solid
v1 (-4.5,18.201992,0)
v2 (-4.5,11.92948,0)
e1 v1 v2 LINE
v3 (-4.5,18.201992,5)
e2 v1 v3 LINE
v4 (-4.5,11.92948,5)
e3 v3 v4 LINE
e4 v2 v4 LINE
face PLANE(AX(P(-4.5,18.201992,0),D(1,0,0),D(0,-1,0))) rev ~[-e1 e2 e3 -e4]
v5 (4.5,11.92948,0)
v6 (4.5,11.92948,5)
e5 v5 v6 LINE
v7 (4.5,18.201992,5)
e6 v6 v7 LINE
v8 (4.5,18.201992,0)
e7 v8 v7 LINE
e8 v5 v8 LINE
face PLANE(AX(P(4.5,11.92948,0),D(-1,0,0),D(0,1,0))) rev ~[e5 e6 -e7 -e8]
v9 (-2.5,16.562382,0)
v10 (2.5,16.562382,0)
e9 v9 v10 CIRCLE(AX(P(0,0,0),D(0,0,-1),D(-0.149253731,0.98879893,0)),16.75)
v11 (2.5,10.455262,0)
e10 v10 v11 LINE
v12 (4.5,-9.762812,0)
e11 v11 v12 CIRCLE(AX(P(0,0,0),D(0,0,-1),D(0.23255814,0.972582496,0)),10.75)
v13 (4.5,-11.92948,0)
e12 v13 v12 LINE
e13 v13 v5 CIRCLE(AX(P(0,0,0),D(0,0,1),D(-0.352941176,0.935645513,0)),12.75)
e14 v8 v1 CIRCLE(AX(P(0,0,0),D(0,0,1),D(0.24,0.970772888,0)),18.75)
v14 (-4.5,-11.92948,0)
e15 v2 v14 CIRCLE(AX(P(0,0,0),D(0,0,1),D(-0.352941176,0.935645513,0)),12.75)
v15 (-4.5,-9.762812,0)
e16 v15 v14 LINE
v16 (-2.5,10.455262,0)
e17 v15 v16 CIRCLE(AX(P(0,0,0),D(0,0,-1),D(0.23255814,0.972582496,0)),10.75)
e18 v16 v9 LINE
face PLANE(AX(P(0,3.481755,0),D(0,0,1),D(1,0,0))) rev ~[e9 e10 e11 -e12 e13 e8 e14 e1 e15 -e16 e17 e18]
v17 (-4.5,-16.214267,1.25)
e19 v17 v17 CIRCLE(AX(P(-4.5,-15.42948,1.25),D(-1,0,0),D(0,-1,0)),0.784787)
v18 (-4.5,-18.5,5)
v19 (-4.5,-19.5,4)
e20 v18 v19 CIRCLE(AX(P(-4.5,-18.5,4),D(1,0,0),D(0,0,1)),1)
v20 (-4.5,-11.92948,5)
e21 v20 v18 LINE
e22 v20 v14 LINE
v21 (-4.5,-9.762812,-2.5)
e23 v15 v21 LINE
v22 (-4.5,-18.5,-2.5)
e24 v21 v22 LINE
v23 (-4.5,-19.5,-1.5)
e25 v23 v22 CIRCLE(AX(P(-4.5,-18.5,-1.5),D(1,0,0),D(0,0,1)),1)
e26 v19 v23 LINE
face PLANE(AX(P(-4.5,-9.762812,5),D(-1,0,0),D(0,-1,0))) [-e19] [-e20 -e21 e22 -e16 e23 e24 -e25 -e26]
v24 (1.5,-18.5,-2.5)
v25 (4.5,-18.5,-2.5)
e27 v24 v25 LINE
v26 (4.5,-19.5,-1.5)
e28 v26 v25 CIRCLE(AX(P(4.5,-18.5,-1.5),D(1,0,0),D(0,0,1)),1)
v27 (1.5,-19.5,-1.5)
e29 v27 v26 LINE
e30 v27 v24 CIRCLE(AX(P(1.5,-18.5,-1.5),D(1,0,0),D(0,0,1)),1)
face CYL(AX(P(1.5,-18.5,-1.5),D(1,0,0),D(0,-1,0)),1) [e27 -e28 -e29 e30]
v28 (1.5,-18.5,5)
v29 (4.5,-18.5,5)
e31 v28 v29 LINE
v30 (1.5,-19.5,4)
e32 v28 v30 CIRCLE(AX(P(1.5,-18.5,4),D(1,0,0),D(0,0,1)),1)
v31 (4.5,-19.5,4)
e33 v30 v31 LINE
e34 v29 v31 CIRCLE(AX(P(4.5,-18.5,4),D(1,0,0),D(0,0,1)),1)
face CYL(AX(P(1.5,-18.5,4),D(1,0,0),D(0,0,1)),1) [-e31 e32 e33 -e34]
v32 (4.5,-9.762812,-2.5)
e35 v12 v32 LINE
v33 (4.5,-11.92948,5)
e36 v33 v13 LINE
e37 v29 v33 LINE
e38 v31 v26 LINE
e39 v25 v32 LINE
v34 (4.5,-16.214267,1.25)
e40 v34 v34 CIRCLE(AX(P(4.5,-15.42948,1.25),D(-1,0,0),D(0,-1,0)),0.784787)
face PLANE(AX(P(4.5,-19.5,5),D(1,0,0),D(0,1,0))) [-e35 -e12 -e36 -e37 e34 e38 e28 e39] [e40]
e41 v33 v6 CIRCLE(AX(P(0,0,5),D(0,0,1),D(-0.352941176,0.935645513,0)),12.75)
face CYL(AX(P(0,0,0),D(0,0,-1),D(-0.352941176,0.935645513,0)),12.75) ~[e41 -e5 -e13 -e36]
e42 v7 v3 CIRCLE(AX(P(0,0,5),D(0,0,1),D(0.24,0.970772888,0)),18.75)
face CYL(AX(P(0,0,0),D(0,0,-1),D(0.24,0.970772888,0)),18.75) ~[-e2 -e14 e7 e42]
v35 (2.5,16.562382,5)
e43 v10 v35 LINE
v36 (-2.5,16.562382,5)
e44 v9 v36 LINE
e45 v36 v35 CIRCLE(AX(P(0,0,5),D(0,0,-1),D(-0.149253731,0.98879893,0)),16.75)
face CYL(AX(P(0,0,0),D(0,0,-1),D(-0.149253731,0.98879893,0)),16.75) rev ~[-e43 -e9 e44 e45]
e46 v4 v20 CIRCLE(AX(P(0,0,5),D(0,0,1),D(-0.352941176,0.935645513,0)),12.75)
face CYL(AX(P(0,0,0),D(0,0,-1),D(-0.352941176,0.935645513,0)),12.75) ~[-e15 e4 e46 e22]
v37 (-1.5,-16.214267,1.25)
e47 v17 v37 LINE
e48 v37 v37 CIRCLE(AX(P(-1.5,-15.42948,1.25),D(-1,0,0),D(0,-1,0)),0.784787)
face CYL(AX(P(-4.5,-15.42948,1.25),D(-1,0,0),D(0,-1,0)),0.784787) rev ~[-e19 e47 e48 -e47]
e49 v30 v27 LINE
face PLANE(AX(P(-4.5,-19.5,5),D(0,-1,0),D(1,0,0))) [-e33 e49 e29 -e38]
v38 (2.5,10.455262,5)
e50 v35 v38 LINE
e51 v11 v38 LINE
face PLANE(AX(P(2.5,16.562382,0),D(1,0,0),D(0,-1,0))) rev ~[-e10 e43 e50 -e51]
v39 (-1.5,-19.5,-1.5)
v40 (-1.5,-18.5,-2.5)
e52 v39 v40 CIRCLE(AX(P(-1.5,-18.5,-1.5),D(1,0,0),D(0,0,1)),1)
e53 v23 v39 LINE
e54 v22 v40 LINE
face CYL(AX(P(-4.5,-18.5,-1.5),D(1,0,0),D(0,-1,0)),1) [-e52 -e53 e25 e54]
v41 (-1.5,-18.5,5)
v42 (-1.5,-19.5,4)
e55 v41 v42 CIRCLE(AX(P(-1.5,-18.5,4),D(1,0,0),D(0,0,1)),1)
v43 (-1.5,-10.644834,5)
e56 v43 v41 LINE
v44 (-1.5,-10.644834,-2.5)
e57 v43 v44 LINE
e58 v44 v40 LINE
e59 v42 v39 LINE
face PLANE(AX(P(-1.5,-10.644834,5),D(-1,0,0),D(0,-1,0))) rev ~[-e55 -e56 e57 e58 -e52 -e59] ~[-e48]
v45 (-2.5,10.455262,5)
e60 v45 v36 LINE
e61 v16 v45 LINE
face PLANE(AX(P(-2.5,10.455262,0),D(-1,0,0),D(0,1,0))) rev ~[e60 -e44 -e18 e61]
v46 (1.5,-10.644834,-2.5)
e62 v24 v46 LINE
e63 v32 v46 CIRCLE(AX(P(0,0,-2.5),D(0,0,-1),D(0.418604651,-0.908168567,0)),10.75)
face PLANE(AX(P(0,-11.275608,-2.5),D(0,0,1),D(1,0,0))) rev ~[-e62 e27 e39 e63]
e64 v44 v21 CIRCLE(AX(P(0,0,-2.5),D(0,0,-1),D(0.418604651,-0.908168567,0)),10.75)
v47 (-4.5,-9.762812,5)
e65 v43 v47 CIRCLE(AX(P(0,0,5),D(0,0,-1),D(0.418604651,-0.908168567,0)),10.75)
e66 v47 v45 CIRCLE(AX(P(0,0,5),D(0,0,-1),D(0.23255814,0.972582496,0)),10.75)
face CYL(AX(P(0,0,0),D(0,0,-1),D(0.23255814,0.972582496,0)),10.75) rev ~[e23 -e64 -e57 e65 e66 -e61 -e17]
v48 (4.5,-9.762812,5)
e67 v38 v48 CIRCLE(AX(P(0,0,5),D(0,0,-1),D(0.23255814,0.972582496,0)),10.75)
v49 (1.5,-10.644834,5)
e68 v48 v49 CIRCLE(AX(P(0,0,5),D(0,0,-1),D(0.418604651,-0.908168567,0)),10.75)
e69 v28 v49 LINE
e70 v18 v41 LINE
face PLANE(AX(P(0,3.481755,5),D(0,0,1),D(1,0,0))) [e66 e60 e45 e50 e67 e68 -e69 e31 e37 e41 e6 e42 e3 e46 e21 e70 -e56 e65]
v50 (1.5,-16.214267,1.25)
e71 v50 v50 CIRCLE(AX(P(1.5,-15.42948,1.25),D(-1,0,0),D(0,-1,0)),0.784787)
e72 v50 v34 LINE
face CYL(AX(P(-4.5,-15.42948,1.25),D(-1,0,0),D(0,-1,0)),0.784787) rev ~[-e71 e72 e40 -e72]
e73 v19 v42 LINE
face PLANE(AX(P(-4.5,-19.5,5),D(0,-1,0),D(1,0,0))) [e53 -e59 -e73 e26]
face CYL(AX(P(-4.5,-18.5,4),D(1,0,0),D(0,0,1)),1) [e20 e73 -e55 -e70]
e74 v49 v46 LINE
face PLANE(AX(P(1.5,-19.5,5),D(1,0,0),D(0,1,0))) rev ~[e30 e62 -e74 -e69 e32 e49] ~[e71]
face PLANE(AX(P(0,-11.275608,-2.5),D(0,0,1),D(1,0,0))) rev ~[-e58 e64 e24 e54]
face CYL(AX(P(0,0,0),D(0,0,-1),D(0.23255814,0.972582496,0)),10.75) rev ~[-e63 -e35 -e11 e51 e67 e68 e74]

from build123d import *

# Parameters (mm, degrees)
F1_DEPTH = 5
F3_DEPTH = 7.5
F5_DEPTH = 7.5
F6_R     = 1
F7_R     = 0.7847872087
F8_DEPTH = 25


with BuildPart() as f1:
    # F0 (on Top) → F1 (new body)
    with BuildSketch(Plane.XY):
        with BuildLine():
            Line((-4.5, 18.2019916493), (-4.5, 11.9294802904))
            ThreePointArc((-4.5, 11.9294802904), (0, -12.75), (4.5, 11.9294802904))
            Line((4.5, 11.9294802904), (4.5, 18.2019916493))
            ThreePointArc((4.5, 18.2019916493), (0, 18.75), (-4.5, 18.2019916493))
        make_face()
        with BuildLine():
            ThreePointArc((2.5, 10.4552618332), (0, -10.75), (-2.5, 10.4552618332))
            Line((-2.5, 10.4552618332), (-2.5, 16.5623820751))
            ThreePointArc((-2.5, 16.5623820751), (0, 16.75), (2.5, 16.5623820751))
            Line((2.5, 16.5623820751), (2.5, 10.4552618332))
        make_face(mode=Mode.SUBTRACT)
    extrude(amount=F1_DEPTH)

    # F2 (on face) → F3 (join)
    with BuildSketch(Plane.XY.offset(5)):
        with BuildLine():
            ThreePointArc((4.5, -9.7628120949), (0, -10.75), (-4.5, -9.7628120949))
            Line((-4.5, -9.7628120949), (-4.5, -11.9294802904))
            ThreePointArc((-4.5, -11.9294802904), (0, -12.75), (4.5, -11.9294802904))
            Line((4.5, -11.9294802904), (4.5, -9.7628120949))
        make_face()
        with BuildLine():
            ThreePointArc((4.5, -11.9294802904), (0, -12.75), (-4.5, -11.9294802904))
            Line((-4.5, -11.9294802904), (-4.5, -19.5))
            Line((-4.5, -19.5), (4.5, -19.5))
            Line((4.5, -19.5), (4.5, -11.9294802904))
        make_face()
    extrude(amount=-F3_DEPTH)

    # F4 (on face) → F5 (cut, through all)
    with BuildSketch(Plane.XY.offset(5)):
        with BuildLine():
            ThreePointArc((1.5, -10.644834428), (0, -10.75), (-1.5, -10.644834428))
            Line((-1.5, -10.644834428), (-1.5, -19.5))
            Line((-1.5, -19.5), (1.5, -19.5))
            Line((1.5, -19.5), (1.5, -10.644834428))
        make_face()
    extrude(amount=-F5_DEPTH, mode=Mode.SUBTRACT)

    # F6
    f6_edges = [f1.edges().sort_by_distance(p)[0] for p in [
        (-3, -19.5, 5),
        (3, -19.5, 5),
        (3, -19.5, -2.5),
        (-3, -19.5, -2.5),
    ]]
    fillet(f6_edges, radius=F6_R)

    # F7 (on face) → F8 (cut)
    with BuildSketch(Plane(origin=(-4.5, 0, 0), x_dir=(0, -1, 0), z_dir=(-1, 0, 0))):
        with Locations((15.4294802904, 1.25)):
            Circle(F7_R)
    extrude(amount=-F8_DEPTH, mode=Mode.SUBTRACT)


solid = f1.part
